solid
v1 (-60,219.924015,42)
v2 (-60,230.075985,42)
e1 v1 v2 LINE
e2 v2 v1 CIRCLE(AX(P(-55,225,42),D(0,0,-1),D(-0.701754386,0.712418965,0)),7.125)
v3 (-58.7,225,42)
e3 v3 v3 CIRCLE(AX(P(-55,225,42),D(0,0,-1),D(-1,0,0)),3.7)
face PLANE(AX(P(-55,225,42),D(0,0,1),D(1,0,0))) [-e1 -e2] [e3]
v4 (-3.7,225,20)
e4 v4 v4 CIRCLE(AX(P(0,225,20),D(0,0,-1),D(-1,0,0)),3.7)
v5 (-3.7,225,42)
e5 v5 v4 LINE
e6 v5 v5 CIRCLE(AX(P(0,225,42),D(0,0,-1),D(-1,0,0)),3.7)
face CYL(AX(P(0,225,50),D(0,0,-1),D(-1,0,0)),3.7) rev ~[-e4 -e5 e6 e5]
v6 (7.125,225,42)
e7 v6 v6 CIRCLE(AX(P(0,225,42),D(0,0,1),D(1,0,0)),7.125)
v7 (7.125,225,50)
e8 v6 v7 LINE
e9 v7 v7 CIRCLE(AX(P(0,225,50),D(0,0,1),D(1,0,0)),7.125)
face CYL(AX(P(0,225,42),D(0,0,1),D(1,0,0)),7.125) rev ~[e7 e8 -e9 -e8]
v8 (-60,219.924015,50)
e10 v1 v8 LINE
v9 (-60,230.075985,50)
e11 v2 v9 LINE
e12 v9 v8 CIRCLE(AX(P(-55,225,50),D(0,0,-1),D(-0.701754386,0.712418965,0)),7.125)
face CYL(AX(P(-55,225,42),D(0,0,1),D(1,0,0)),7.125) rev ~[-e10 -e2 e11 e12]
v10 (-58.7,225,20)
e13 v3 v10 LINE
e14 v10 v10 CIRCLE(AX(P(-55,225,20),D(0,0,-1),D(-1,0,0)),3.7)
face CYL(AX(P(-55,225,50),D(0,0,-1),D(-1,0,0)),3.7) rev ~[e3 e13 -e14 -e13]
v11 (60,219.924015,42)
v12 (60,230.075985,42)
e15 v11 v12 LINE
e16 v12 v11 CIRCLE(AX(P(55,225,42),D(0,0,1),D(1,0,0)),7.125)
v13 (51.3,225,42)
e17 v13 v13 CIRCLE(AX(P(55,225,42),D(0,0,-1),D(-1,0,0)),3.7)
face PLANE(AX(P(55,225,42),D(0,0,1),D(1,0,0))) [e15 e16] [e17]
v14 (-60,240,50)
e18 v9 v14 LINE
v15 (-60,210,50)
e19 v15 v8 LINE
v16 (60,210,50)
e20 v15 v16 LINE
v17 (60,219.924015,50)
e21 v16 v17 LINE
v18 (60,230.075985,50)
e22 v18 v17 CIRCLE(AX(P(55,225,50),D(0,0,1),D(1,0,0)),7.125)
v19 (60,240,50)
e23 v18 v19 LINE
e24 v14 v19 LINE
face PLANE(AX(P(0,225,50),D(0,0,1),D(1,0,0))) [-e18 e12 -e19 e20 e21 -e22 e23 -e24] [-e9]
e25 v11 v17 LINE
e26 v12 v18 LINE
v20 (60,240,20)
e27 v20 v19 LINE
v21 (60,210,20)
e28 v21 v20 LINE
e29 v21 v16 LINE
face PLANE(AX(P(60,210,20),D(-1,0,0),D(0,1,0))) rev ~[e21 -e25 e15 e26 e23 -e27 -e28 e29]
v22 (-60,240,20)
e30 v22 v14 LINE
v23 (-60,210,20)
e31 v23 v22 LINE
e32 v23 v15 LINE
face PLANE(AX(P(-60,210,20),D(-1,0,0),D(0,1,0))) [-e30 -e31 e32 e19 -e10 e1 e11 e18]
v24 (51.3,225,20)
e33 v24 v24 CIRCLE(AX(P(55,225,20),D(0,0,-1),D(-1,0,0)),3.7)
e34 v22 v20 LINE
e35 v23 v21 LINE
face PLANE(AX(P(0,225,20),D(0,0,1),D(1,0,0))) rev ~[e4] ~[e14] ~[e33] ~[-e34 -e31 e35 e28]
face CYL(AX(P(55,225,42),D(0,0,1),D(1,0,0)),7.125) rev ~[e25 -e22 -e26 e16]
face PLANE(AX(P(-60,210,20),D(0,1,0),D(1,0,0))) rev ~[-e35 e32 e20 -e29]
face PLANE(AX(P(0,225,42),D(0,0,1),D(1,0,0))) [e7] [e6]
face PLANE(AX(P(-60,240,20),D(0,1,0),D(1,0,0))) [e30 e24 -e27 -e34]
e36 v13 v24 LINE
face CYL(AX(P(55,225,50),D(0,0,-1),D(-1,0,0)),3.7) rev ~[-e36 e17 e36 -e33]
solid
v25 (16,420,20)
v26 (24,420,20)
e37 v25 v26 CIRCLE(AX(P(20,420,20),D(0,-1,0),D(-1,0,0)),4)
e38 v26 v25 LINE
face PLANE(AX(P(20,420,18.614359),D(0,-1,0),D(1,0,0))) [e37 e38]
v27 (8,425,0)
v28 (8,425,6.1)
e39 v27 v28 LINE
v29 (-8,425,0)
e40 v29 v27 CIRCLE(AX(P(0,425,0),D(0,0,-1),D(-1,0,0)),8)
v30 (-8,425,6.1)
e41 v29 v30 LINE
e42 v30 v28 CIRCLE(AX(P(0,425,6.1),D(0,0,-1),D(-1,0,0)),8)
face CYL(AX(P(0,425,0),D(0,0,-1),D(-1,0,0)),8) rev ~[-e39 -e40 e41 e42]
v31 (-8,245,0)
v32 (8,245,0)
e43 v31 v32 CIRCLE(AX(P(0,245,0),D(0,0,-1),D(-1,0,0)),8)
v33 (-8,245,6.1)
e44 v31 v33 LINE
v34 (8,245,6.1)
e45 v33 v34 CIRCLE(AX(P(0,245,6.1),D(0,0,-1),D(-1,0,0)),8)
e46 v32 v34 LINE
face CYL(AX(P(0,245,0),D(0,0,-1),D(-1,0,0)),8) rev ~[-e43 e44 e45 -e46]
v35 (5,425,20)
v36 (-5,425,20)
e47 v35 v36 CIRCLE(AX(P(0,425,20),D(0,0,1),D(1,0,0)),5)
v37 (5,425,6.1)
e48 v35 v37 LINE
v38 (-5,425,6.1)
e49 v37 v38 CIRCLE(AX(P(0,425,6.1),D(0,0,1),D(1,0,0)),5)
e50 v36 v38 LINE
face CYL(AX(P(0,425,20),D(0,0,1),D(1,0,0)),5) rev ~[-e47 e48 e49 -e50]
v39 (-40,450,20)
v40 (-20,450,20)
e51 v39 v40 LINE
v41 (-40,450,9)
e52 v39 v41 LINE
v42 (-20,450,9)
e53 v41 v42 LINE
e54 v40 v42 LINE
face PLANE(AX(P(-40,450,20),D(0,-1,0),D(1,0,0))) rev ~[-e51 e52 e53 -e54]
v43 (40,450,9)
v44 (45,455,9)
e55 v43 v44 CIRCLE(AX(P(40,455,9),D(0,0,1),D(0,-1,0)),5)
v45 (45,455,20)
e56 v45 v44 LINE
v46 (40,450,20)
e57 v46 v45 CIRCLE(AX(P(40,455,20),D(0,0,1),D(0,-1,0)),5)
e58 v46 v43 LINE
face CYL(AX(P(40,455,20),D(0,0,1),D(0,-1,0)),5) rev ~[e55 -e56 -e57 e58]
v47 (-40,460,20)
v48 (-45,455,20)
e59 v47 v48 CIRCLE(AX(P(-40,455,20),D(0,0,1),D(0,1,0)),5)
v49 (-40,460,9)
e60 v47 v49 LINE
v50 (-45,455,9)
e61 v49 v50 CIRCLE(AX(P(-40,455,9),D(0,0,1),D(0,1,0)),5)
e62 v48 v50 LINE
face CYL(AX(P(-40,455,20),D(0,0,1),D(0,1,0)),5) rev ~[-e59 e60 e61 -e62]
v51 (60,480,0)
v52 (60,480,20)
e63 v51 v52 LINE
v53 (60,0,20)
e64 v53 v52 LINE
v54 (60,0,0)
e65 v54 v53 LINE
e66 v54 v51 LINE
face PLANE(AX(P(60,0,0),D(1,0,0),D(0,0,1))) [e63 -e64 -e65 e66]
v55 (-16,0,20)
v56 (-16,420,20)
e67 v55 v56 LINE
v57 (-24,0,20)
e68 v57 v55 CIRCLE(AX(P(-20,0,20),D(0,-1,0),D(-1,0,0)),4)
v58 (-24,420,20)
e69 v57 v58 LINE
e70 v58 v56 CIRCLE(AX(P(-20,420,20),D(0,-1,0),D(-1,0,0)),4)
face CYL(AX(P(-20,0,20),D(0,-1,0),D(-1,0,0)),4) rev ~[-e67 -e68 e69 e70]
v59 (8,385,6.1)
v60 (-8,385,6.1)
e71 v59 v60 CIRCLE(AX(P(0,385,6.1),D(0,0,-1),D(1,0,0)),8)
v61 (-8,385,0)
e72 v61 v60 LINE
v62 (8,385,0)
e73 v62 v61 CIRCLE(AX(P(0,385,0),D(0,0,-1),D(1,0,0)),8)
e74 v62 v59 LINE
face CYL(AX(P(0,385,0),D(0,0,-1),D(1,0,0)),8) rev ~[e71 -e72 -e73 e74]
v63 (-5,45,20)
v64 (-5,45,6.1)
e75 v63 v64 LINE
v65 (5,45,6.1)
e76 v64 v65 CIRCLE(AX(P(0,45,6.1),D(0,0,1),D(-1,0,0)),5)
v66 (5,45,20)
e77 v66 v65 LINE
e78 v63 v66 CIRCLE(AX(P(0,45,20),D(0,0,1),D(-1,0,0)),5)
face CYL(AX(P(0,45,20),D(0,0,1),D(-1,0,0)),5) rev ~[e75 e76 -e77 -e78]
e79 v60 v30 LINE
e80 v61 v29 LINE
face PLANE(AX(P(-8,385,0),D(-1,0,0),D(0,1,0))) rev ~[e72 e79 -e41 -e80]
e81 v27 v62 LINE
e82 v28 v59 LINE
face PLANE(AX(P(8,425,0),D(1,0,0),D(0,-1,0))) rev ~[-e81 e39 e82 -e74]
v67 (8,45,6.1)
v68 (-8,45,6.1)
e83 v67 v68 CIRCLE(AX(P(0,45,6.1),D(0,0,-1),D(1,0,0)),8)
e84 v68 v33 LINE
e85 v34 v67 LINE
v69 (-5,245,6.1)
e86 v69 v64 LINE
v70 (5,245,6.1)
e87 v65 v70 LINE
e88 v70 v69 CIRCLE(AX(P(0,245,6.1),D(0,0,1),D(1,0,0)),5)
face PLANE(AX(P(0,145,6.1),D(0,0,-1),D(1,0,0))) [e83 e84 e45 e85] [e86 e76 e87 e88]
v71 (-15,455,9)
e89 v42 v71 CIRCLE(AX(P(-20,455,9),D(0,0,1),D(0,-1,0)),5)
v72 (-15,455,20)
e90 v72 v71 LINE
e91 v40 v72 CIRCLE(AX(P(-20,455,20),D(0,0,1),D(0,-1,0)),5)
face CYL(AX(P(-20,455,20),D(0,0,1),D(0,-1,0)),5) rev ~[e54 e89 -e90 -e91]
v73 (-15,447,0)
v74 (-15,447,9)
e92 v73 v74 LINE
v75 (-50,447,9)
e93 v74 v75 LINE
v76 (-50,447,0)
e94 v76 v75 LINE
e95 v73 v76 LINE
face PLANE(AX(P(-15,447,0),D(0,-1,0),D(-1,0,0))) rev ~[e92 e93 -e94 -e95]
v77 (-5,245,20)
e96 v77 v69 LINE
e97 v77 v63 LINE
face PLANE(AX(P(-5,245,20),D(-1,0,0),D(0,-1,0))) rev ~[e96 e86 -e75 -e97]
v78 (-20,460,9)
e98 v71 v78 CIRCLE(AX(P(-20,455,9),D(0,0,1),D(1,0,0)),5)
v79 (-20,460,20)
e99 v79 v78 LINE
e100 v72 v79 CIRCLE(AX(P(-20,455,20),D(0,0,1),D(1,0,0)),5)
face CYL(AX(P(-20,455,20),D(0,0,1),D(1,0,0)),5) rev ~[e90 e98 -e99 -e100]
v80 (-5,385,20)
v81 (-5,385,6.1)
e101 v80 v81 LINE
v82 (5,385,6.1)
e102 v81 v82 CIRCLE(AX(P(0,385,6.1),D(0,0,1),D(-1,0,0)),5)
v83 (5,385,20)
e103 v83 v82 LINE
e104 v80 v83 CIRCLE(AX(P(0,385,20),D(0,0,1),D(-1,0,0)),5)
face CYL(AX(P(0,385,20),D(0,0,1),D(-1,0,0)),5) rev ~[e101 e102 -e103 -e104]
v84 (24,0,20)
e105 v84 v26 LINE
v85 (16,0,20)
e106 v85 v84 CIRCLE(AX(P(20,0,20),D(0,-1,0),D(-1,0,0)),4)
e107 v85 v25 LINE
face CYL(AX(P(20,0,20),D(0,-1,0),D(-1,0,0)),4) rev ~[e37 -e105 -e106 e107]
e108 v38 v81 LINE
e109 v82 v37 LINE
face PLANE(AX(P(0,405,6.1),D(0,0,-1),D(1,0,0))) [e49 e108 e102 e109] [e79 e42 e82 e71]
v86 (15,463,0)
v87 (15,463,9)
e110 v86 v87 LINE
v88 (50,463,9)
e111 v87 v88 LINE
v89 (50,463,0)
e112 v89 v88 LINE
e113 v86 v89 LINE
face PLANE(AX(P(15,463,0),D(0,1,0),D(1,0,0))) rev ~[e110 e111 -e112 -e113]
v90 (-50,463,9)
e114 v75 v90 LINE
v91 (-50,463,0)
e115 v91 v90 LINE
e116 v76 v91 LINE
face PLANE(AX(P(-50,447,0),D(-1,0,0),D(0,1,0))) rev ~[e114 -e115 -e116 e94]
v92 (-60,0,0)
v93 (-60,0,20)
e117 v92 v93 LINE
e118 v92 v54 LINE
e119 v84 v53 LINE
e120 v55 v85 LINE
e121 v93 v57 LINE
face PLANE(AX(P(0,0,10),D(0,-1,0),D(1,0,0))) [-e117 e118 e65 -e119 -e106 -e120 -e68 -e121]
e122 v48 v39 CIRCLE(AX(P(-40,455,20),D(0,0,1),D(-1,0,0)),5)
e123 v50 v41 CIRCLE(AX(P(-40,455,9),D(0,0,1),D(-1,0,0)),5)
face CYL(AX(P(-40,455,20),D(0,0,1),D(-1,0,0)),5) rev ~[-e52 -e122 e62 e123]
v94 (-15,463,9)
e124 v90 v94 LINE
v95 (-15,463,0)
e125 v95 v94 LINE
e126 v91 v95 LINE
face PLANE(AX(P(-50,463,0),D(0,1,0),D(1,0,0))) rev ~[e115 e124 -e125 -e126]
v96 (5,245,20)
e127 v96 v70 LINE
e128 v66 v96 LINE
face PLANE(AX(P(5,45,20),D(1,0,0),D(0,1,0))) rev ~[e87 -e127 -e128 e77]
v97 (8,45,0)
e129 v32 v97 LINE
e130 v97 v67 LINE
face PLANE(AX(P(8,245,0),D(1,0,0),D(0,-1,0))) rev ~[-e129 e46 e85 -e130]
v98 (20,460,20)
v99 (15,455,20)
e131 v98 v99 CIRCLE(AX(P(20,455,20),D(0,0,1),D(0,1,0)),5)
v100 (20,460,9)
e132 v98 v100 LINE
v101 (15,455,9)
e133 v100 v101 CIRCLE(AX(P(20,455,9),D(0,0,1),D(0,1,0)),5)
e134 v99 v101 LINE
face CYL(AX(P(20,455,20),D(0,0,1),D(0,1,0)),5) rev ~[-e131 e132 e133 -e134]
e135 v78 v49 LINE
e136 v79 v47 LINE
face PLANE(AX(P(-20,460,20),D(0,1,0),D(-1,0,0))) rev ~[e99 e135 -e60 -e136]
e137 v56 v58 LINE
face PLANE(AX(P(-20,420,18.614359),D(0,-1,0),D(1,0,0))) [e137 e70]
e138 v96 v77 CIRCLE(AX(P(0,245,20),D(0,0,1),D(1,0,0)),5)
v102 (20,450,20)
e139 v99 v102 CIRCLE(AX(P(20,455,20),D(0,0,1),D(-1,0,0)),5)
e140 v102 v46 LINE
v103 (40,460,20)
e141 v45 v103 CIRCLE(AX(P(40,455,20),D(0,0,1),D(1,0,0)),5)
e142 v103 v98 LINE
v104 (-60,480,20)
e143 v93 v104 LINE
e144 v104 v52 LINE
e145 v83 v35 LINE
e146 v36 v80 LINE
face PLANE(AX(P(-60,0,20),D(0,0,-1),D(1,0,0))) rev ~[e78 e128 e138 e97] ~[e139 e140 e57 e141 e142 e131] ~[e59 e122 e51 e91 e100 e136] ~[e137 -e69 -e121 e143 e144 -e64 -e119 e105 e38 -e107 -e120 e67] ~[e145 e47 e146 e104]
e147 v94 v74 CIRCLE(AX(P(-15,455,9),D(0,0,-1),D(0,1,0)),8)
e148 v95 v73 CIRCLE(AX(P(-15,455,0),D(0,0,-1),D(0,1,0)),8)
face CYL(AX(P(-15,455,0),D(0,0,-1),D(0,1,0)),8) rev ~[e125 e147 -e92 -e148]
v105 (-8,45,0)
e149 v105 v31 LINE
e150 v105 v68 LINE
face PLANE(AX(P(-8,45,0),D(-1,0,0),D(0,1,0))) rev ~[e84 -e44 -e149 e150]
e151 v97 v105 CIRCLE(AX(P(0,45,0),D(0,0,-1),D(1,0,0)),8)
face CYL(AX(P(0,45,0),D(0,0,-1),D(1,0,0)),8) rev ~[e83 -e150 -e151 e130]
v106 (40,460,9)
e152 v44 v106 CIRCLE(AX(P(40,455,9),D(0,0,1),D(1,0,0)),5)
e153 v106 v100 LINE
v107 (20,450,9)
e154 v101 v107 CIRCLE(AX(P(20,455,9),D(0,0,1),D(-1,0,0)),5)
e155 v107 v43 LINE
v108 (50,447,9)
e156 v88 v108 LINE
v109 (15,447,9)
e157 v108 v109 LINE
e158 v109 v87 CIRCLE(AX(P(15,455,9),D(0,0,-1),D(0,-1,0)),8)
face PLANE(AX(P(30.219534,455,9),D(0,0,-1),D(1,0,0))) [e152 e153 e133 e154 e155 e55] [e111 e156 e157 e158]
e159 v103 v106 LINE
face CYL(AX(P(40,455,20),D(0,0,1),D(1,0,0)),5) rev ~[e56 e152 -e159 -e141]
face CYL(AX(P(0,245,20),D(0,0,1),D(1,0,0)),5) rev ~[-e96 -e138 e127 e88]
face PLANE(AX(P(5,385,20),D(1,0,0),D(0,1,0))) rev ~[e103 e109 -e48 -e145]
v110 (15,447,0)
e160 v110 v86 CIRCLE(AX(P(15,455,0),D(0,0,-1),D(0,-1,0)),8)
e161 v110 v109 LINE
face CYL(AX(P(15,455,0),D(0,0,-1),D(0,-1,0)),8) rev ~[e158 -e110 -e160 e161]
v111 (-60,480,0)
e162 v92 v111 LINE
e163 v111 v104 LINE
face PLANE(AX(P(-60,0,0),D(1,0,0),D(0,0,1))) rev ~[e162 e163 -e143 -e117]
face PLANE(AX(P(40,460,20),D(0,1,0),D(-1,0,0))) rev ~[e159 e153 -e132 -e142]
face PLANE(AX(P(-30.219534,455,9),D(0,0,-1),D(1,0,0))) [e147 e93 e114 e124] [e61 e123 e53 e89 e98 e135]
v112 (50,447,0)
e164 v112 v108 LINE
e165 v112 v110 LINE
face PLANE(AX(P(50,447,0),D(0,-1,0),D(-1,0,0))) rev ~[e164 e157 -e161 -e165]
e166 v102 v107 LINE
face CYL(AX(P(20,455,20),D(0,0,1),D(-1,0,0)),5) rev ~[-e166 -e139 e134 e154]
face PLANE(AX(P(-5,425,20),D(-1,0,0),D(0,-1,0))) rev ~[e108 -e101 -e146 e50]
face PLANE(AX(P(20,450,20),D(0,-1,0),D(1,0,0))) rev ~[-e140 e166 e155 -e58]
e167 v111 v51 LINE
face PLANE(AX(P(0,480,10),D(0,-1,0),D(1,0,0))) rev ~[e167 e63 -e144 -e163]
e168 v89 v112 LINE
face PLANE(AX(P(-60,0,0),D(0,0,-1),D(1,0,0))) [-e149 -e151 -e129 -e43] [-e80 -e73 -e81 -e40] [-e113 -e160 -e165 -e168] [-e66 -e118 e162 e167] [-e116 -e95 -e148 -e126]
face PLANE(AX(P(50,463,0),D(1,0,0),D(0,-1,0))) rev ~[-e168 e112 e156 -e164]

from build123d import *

# Parameters (mm, degrees)
F0_W            = 120
F0_H            = 20
F1_DEPTH        = 480
F3_DEPTH        = 20.001
F5_DEPTH        = 6.1
F7_DEPTH        = 20.001
F9_DEPTH        = 9
F11_DEPTH       = 420
F12_W           = 120
F12_H           = 30
F13_DEPTH       = 30
F15_D           = 7.4
F15_DEPTH       = 50
F15_CBORE_D     = 14.25
F15_CBORE_DEPTH = 8
F15_TIP         = 2.2231842904


# Not quite as in the source:
# - a feature names something its author has since deleted; it is built from what else it names


with BuildPart() as f1:
    # F0 (on Front) → F1 (new body)
    with BuildSketch(Plane.XZ):
        with Locations((0, 10)):
            Rectangle(F0_W, F0_H)
    extrude(amount=-F1_DEPTH)

    # F2 (on face) → F3 (cut, through all)
    with BuildSketch(Plane.XY.offset(20)):
        with BuildLine():
            ThreePointArc((5, 245), (0, 250), (-5, 245))
            Line((-5, 245), (-5, 45))
            ThreePointArc((-5, 45), (0, 40), (5, 45))
            Line((5, 45), (5, 245))
        make_face()
        with BuildLine():
            ThreePointArc((5, 425), (0, 430), (-5, 425))
            Line((-5, 425), (-5, 385))
            ThreePointArc((-5, 385), (0, 380), (5, 385))
            Line((5, 385), (5, 425))
        make_face()
    extrude(amount=-F3_DEPTH, mode=Mode.SUBTRACT)

    # F4 (on face) → F5 (cut)
    with BuildSketch(Plane(origin=(0, 0, 0), x_dir=(1, 0, 0), z_dir=(0, 0, -1))):
        with BuildLine():
            Line((8, -245), (8, -45))
            ThreePointArc((8, -45), (0, -37), (-8, -45))
            Line((-8, -45), (-8, -245))
            ThreePointArc((-8, -245), (0, -253), (8, -245))
        make_face()
        with BuildLine():
            ThreePointArc((8, -385), (0, -377), (-8, -385))
            Line((-8, -385), (-8, -425))
            ThreePointArc((-8, -425), (0, -433), (8, -425))
            Line((8, -425), (8, -385))
        make_face()
    extrude(amount=-F5_DEPTH, mode=Mode.SUBTRACT)

    # F6 (on face) → F7 (cut, through all)
    with BuildSketch(Plane.XY.offset(20)):
        with BuildLine():
            ThreePointArc((-45, 455), (-43.5355339059, 451.4644660941), (-40, 450))
            Line((-40, 450), (-20, 450))
            ThreePointArc((-20, 450), (-16.4644660941, 451.4644660941), (-15, 455))
            ThreePointArc((-15, 455), (-16.4644660941, 458.5355339059), (-20, 460))
            Line((-20, 460), (-40, 460))
            ThreePointArc((-40, 460), (-43.5355339059, 458.5355339059), (-45, 455))
        make_face()
        with BuildLine():
            ThreePointArc((45, 455), (43.5355339059, 458.5355339059), (40, 460))
            Line((40, 460), (20, 460))
            ThreePointArc((20, 460), (16.4644660941, 458.5355339059), (15, 455))
            ThreePointArc((15, 455), (16.4644660941, 451.4644660941), (20, 450))
            Line((20, 450), (40, 450))
            ThreePointArc((40, 450), (43.5355339059, 451.4644660941), (45, 455))
        make_face()
    extrude(amount=-F7_DEPTH, mode=Mode.SUBTRACT)

    # F8 (on face) → F9 (cut)
    with BuildSketch(Plane(origin=(0, 0, 0), x_dir=(1, 0, 0), z_dir=(0, 0, -1))):
        with BuildLine():
            Line((-15, -447), (-50, -447))
            Line((-50, -447), (-50, -463))
            Line((-50, -463), (-15, -463))
            ThreePointArc((-15, -463), (-7, -455), (-15, -447))
        make_face()
        with BuildLine():
            Line((50, -447), (15, -447))
            ThreePointArc((15, -447), (7, -455), (15, -463))
            Line((15, -463), (50, -463))
            Line((50, -463), (50, -447))
        make_face()
    extrude(amount=-F9_DEPTH, mode=Mode.SUBTRACT)

    # F10 (on face) → F11 (cut)
    with BuildSketch(Plane.XZ):
        with BuildLine():
            ThreePointArc((-24, 20), (-20, 16), (-16, 20))
            Line((-16, 20), (-24, 20))
        make_face()
        with BuildLine():
            Line((24, 20), (16, 20))
            ThreePointArc((16, 20), (20, 16), (24, 20))
        make_face()
    extrude(amount=-F11_DEPTH, mode=Mode.SUBTRACT)


with BuildPart() as f13:
    # F12 (on face) → F13 (new body)
    with BuildSketch(Plane.XY.offset(20)):
        with Locations((0, 225)):
            Rectangle(F12_W, F12_H)
    extrude(amount=F13_DEPTH)

    # F15
    with Locations(Plane.XY.offset(50)):
        with Locations((-55, 225), (55, 225), (0, 225)):
            CounterBoreHole(F15_D / 2, F15_CBORE_D / 2, F15_CBORE_DEPTH, depth=F15_DEPTH)
            with Locations((0, 0, -(F15_DEPTH + F15_TIP / 2))):  # 118° drill point
                Cone(0, F15_D / 2, F15_TIP, mode=Mode.SUBTRACT)


solid = Compound([f1.part, f13.part])
